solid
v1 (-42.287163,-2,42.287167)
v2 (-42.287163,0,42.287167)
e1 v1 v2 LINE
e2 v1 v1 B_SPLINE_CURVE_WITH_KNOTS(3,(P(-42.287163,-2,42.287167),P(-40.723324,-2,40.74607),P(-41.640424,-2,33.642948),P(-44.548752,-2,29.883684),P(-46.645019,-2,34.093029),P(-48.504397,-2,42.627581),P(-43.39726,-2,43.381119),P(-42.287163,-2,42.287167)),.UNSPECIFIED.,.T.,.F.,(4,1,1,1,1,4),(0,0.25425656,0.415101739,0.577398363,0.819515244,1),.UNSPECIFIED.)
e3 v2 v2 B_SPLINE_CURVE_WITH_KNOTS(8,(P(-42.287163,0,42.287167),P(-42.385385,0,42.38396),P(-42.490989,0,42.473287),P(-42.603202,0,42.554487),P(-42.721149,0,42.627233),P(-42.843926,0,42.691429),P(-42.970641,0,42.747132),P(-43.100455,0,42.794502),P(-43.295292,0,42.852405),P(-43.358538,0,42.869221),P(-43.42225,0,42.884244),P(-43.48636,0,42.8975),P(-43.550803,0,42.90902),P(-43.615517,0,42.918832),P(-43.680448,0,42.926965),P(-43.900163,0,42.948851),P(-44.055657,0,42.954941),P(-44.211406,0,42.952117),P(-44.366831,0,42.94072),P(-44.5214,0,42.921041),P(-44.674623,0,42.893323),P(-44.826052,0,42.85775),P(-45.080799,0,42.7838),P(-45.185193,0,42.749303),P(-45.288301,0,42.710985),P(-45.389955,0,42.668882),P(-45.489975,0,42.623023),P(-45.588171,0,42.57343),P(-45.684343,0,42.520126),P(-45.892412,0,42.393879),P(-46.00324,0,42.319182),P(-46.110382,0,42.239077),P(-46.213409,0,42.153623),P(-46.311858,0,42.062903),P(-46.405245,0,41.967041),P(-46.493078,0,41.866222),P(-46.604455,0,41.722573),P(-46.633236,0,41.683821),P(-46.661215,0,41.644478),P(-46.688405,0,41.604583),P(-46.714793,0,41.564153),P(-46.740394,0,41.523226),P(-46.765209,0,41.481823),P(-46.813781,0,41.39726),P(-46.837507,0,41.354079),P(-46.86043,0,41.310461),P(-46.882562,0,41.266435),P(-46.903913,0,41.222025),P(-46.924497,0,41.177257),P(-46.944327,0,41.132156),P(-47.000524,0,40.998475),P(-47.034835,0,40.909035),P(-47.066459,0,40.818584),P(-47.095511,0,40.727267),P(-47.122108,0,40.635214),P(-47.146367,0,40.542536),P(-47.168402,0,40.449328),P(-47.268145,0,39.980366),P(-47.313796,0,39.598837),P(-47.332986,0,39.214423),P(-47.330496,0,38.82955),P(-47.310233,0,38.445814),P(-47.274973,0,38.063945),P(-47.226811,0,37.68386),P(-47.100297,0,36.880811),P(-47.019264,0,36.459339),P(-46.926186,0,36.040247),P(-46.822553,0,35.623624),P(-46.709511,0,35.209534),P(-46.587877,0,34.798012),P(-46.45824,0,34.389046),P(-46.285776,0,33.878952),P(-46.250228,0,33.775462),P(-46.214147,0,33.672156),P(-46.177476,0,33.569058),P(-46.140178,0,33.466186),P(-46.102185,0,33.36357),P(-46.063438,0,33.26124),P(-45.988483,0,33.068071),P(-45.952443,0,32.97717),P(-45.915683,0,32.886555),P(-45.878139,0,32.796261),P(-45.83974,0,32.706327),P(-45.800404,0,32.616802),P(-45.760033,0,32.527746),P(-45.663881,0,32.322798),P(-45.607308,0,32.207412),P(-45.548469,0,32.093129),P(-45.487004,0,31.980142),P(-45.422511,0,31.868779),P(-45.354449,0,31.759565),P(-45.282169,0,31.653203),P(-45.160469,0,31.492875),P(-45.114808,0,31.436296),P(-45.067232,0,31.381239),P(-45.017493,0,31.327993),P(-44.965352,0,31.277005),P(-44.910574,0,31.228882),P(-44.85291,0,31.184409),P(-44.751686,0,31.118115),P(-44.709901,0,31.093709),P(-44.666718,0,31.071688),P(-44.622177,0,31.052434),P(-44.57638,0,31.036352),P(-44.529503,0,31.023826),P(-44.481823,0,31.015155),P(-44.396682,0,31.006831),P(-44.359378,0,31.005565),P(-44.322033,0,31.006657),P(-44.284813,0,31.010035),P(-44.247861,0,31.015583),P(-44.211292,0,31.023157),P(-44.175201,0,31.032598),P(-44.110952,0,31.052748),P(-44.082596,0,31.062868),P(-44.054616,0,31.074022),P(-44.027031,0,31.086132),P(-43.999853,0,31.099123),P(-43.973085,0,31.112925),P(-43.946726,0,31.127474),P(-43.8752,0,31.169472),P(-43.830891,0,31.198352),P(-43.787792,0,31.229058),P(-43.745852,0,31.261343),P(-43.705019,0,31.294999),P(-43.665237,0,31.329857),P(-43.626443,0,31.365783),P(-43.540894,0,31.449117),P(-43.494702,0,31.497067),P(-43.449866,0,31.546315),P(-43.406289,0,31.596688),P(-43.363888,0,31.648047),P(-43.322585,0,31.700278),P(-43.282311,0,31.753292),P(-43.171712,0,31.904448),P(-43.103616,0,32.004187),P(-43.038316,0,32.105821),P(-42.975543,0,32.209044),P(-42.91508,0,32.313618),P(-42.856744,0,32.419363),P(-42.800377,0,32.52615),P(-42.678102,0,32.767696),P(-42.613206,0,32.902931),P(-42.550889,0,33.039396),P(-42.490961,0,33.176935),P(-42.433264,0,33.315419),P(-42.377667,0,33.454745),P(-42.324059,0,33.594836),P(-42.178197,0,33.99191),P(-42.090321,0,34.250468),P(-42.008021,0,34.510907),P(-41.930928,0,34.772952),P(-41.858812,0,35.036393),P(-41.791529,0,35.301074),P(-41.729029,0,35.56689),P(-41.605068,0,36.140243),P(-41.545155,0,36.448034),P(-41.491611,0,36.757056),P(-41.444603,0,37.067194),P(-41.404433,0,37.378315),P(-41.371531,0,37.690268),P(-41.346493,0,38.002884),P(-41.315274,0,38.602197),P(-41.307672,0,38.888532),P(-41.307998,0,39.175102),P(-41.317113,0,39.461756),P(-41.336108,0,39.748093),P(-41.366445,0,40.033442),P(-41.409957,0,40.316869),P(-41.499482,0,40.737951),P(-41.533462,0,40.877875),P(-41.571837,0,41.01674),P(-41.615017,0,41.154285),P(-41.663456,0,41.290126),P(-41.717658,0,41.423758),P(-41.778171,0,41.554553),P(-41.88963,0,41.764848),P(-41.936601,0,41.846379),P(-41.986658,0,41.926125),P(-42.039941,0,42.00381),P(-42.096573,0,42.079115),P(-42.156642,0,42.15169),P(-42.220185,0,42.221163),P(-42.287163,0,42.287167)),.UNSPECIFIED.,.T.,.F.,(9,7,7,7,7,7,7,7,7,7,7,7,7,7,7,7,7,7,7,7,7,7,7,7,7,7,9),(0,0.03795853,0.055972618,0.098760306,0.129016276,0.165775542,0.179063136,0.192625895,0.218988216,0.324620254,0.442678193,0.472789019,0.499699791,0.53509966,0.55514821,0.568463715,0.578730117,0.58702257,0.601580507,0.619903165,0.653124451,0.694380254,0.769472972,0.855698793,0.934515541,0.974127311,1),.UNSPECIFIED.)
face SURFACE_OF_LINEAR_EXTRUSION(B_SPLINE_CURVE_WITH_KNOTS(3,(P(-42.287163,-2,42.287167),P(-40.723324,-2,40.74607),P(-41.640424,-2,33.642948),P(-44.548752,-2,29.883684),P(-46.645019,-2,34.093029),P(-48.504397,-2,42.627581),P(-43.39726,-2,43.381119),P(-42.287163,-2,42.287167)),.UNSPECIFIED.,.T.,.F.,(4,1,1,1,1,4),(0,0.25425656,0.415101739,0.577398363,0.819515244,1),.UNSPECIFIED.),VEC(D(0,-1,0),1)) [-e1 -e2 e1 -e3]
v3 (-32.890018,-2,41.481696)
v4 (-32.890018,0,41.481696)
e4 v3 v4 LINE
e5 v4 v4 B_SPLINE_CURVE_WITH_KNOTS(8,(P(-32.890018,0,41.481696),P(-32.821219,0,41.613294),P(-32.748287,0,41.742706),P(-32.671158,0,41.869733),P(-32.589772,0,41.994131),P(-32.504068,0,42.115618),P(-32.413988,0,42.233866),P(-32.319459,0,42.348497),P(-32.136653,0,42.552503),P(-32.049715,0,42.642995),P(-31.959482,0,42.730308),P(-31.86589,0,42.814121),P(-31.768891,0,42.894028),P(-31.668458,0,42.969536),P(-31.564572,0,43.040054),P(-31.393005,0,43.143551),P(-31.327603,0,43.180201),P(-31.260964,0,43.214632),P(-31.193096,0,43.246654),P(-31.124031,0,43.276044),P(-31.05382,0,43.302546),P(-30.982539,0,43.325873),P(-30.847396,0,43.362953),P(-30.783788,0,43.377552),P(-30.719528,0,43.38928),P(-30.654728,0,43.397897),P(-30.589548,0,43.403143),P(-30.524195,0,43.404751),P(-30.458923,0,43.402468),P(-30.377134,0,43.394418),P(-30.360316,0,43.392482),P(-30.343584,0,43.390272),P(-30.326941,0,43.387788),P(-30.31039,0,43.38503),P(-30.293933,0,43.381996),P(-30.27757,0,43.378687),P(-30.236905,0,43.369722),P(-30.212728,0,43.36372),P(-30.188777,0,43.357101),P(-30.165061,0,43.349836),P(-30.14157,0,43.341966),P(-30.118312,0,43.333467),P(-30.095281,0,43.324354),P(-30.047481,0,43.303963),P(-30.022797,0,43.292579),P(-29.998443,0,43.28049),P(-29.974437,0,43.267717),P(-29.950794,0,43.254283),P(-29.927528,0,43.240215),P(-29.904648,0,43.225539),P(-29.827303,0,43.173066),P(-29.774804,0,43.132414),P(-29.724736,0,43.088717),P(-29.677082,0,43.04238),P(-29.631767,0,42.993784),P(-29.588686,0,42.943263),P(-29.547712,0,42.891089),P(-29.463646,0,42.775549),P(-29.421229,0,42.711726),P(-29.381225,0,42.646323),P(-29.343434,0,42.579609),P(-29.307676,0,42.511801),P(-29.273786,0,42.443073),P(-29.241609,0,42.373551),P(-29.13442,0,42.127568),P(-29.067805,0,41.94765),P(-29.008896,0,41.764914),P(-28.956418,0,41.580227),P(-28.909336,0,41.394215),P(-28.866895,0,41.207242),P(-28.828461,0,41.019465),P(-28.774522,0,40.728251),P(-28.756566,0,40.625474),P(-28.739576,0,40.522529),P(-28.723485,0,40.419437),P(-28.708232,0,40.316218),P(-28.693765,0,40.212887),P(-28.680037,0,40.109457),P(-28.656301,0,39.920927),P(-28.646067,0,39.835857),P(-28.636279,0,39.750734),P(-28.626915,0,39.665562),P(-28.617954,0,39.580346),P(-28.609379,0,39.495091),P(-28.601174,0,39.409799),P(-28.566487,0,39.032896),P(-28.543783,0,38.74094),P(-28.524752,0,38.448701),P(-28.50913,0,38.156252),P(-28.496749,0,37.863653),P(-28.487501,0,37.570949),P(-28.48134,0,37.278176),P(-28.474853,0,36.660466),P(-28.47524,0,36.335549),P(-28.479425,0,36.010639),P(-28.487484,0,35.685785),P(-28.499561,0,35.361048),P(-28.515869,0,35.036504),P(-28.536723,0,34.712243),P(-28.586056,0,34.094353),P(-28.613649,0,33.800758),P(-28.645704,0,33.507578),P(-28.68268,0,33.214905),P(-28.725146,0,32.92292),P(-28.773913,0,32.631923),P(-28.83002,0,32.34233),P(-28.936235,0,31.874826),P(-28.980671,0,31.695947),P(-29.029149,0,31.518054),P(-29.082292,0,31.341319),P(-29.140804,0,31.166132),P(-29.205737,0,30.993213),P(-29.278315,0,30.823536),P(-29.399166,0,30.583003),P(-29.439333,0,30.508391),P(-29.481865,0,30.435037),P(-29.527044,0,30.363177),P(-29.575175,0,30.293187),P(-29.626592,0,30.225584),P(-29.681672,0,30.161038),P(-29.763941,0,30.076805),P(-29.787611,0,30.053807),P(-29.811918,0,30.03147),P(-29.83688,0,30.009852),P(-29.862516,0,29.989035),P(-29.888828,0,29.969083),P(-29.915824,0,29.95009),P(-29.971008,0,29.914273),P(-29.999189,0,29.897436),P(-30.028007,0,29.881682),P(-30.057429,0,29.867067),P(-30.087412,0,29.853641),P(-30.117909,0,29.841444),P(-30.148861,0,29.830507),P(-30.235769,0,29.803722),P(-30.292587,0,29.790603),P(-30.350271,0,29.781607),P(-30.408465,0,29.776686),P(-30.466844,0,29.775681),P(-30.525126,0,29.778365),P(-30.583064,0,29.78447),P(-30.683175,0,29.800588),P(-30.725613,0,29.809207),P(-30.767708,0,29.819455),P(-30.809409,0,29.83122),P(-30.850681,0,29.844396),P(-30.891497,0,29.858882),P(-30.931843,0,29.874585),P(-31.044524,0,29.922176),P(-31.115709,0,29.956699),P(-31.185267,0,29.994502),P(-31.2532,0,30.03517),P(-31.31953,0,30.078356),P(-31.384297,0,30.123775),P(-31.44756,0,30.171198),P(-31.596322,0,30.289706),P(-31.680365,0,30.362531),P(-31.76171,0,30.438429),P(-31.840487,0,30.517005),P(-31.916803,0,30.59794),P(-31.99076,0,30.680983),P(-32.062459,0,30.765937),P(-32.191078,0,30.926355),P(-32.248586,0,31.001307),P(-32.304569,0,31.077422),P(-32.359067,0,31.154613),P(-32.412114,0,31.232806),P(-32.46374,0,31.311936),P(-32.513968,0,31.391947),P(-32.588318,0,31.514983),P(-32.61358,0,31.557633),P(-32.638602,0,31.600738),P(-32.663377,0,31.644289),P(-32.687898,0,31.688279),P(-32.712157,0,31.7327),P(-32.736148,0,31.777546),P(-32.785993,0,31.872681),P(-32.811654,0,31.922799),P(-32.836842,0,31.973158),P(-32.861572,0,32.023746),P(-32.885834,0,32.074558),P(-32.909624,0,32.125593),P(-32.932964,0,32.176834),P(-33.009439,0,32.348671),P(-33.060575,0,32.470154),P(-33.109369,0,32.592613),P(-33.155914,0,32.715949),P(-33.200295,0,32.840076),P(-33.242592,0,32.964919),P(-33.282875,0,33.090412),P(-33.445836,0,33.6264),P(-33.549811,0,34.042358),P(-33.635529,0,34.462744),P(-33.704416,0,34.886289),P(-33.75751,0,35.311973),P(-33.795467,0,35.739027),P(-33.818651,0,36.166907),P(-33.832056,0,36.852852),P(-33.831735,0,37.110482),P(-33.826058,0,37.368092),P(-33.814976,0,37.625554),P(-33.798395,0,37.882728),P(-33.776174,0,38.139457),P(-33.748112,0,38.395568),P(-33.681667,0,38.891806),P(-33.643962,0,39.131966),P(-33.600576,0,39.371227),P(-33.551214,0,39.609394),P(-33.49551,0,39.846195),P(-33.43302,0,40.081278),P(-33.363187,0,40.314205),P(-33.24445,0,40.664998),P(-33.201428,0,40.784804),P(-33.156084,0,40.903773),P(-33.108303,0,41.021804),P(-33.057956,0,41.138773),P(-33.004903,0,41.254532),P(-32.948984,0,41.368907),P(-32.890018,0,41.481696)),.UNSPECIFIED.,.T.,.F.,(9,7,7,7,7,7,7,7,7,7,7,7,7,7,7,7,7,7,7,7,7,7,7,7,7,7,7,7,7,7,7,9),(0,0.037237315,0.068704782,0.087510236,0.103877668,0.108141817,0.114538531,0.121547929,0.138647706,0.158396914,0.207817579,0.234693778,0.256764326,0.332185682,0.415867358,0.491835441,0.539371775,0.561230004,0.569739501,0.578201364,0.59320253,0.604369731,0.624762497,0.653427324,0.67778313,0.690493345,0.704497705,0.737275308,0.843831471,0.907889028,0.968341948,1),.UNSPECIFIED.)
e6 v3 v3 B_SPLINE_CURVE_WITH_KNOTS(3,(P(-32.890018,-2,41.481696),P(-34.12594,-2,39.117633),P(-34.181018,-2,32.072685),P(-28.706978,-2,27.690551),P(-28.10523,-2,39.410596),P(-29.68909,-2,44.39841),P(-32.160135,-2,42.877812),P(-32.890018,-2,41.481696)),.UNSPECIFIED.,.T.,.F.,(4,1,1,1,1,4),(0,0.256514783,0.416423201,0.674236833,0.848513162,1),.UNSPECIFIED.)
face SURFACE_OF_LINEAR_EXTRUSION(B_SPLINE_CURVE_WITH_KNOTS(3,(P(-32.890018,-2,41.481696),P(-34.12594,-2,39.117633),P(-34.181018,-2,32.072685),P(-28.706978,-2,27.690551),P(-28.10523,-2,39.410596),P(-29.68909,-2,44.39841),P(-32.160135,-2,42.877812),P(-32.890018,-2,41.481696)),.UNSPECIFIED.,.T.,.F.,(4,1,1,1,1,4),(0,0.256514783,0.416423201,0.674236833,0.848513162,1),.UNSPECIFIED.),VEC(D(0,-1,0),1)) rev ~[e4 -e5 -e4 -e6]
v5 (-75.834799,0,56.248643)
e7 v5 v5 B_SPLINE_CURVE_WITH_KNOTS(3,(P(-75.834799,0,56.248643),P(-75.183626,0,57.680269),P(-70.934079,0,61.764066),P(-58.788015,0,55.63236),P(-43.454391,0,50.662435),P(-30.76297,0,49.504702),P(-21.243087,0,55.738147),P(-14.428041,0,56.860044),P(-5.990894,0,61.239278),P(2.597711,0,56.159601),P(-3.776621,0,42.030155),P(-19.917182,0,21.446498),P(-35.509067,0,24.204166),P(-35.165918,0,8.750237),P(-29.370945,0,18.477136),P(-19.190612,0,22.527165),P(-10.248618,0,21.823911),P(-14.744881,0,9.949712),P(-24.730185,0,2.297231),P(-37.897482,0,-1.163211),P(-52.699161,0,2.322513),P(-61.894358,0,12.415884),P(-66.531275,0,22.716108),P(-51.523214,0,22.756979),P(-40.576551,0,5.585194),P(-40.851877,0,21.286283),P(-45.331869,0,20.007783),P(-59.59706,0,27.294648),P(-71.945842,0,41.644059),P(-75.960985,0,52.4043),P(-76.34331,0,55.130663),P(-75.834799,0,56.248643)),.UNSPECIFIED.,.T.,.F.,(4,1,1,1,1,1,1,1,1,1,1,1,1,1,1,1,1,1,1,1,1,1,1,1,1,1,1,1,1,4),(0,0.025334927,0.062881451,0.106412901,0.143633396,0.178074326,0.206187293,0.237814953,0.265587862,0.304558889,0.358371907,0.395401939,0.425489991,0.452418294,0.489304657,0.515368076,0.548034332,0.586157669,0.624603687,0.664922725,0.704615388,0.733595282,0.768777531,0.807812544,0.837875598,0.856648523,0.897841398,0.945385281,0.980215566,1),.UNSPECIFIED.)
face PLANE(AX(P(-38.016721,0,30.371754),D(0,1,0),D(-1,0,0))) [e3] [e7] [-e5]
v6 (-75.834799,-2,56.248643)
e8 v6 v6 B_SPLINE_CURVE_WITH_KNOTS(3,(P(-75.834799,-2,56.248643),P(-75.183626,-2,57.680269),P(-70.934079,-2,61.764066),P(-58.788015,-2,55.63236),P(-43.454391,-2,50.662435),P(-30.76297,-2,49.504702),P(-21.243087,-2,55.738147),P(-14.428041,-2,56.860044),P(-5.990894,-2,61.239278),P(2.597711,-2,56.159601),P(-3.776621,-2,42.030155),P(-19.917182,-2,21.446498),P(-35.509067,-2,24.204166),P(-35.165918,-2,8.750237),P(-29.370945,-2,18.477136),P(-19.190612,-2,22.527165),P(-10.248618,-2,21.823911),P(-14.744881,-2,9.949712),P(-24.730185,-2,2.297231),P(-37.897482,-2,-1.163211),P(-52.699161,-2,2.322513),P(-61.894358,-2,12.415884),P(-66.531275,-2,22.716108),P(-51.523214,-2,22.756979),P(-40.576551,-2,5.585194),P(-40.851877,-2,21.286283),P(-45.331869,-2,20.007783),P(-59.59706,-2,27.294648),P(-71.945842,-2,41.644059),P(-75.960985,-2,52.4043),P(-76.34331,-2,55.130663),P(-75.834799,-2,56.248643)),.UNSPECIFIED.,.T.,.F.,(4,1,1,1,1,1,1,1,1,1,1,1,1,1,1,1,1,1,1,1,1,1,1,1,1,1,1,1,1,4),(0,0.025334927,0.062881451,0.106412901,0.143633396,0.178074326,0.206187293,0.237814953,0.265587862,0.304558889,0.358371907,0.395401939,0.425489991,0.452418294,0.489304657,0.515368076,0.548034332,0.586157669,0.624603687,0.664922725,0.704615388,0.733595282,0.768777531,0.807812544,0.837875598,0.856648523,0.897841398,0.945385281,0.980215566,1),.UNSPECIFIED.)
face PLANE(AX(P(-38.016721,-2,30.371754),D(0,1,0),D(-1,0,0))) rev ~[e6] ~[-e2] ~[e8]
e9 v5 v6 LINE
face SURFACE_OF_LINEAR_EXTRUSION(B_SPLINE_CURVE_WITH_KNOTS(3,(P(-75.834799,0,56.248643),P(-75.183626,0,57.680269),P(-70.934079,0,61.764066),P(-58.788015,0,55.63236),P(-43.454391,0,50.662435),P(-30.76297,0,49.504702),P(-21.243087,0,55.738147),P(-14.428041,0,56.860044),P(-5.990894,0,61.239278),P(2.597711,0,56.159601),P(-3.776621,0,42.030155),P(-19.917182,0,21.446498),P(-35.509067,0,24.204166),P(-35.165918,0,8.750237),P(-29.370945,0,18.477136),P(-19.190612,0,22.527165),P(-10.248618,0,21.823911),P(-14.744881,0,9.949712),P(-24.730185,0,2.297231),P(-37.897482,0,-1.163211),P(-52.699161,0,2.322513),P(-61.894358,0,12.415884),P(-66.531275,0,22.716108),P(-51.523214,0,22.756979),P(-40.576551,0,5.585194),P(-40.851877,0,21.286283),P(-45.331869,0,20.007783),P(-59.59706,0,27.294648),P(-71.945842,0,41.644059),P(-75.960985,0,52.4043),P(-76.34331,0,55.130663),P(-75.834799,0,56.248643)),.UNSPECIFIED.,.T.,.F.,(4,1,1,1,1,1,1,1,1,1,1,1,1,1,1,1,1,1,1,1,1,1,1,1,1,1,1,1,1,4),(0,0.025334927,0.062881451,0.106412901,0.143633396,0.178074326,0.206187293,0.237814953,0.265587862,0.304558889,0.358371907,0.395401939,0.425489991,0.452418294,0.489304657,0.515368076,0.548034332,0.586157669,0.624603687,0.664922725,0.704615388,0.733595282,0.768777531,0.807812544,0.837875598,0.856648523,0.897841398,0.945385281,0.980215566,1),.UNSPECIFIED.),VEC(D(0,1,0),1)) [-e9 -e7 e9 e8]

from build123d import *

# Parameters (mm, degrees)
F1_DEPTH = 2
F3_DEPTH = 25


with BuildPart() as f1:
    # F0 (on Front) → F1 (new body)
    with BuildSketch(Plane.XZ):
        with BuildLine():
            add(Edge.make_bspline(
                [(-75.8347990971, 56.2486425042), (-75.1836263652, 57.6802689805), (-70.9340790333, 61.7640658934), (-58.7880150697, 55.6323601286), (-43.4543911865, 50.6624350906), (-30.7629702937, 49.5047020163), (-21.2430871182, 55.7381469131), (-14.4280411182, 56.8600440589), (-5.9908935153, 61.2392779803), (2.5977107271, 56.1596013405), (-3.7766212938, 42.0301545009), (-19.9171824428, 21.4464982023), (-35.5090674399, 24.204165931), (-35.1659184419, 8.7502373537), (-29.3709449572, 18.4771355864), (-19.1906116712, 22.527164785), (-10.2486183797, 21.8239112152), (-14.7448810071, 9.9497124678), (-24.7301847276, 2.2972307162), (-37.8974817036, -1.1632111012), (-52.6991606842, 2.3225134129), (-61.8943580671, 12.4158839786), (-66.5312753548, 22.7161079835), (-51.5232135092, 22.7569790255), (-40.576550772, 5.5851938951), (-40.8518766389, 21.2862833862), (-45.3318688846, 20.0077827884), (-59.5970602772, 27.2946481454), (-71.9458419573, 41.6440588858), (-75.9609853522, 52.4043003525), (-76.3433099111, 55.1306633428), (-75.8347990971, 56.2486425042)],
                knots=[0, 0, 0, 0, 0.0253349266, 0.0628814506, 0.1064129014, 0.1436333956, 0.1780743263, 0.2061872931, 0.2378149533, 0.2655878625, 0.304558889, 0.3583719074, 0.3954019389, 0.4254899915, 0.4524182936, 0.4893046572, 0.5153680757, 0.5480343317, 0.586157669, 0.6246036867, 0.6649227249, 0.7046153879, 0.733595282, 0.7687775312, 0.8078125444, 0.8378755979, 0.8566485225, 0.8978413978, 0.9453852813, 0.9802155657, 1, 1, 1, 1], degree=3))
        make_face()
    extrude(amount=F1_DEPTH)

    # F2 (on face) → F3 (cut)
    with BuildSketch(Plane.XZ.offset(2)):
        with BuildLine():
            add(Edge.make_bspline(
                [(-42.2871634364, 42.2871671617), (-40.7233235578, 40.7460702061), (-41.6404243336, 33.64294769), (-44.5487515397, 29.883684324), (-46.6450188115, 34.0930294047), (-48.5043967712, 42.6275810256), (-43.3972597055, 43.3811193011), (-42.2871634364, 42.2871671617)],
                knots=[0, 0, 0, 0, 0.25425656, 0.4151017388, 0.5773983635, 0.8195152442, 1, 1, 1, 1], degree=3))
        make_face()
        with BuildLine():
            add(Edge.make_bspline(
                [(-32.8900180757, 41.4816960692), (-34.1259395093, 39.117633331), (-34.1810178637, 32.0726846499), (-28.7069781951, 27.6905511122), (-28.1052302328, 39.4105956249), (-29.6890897505, 44.3984102877), (-32.160134876, 42.8778120591), (-32.8900180757, 41.4816960692)],
                knots=[0, 0, 0, 0, 0.2565147826, 0.4164232009, 0.674236833, 0.8485131618, 1, 1, 1, 1], degree=3))
        make_face()
    extrude(amount=-F3_DEPTH, mode=Mode.SUBTRACT)


solid = f1.part
